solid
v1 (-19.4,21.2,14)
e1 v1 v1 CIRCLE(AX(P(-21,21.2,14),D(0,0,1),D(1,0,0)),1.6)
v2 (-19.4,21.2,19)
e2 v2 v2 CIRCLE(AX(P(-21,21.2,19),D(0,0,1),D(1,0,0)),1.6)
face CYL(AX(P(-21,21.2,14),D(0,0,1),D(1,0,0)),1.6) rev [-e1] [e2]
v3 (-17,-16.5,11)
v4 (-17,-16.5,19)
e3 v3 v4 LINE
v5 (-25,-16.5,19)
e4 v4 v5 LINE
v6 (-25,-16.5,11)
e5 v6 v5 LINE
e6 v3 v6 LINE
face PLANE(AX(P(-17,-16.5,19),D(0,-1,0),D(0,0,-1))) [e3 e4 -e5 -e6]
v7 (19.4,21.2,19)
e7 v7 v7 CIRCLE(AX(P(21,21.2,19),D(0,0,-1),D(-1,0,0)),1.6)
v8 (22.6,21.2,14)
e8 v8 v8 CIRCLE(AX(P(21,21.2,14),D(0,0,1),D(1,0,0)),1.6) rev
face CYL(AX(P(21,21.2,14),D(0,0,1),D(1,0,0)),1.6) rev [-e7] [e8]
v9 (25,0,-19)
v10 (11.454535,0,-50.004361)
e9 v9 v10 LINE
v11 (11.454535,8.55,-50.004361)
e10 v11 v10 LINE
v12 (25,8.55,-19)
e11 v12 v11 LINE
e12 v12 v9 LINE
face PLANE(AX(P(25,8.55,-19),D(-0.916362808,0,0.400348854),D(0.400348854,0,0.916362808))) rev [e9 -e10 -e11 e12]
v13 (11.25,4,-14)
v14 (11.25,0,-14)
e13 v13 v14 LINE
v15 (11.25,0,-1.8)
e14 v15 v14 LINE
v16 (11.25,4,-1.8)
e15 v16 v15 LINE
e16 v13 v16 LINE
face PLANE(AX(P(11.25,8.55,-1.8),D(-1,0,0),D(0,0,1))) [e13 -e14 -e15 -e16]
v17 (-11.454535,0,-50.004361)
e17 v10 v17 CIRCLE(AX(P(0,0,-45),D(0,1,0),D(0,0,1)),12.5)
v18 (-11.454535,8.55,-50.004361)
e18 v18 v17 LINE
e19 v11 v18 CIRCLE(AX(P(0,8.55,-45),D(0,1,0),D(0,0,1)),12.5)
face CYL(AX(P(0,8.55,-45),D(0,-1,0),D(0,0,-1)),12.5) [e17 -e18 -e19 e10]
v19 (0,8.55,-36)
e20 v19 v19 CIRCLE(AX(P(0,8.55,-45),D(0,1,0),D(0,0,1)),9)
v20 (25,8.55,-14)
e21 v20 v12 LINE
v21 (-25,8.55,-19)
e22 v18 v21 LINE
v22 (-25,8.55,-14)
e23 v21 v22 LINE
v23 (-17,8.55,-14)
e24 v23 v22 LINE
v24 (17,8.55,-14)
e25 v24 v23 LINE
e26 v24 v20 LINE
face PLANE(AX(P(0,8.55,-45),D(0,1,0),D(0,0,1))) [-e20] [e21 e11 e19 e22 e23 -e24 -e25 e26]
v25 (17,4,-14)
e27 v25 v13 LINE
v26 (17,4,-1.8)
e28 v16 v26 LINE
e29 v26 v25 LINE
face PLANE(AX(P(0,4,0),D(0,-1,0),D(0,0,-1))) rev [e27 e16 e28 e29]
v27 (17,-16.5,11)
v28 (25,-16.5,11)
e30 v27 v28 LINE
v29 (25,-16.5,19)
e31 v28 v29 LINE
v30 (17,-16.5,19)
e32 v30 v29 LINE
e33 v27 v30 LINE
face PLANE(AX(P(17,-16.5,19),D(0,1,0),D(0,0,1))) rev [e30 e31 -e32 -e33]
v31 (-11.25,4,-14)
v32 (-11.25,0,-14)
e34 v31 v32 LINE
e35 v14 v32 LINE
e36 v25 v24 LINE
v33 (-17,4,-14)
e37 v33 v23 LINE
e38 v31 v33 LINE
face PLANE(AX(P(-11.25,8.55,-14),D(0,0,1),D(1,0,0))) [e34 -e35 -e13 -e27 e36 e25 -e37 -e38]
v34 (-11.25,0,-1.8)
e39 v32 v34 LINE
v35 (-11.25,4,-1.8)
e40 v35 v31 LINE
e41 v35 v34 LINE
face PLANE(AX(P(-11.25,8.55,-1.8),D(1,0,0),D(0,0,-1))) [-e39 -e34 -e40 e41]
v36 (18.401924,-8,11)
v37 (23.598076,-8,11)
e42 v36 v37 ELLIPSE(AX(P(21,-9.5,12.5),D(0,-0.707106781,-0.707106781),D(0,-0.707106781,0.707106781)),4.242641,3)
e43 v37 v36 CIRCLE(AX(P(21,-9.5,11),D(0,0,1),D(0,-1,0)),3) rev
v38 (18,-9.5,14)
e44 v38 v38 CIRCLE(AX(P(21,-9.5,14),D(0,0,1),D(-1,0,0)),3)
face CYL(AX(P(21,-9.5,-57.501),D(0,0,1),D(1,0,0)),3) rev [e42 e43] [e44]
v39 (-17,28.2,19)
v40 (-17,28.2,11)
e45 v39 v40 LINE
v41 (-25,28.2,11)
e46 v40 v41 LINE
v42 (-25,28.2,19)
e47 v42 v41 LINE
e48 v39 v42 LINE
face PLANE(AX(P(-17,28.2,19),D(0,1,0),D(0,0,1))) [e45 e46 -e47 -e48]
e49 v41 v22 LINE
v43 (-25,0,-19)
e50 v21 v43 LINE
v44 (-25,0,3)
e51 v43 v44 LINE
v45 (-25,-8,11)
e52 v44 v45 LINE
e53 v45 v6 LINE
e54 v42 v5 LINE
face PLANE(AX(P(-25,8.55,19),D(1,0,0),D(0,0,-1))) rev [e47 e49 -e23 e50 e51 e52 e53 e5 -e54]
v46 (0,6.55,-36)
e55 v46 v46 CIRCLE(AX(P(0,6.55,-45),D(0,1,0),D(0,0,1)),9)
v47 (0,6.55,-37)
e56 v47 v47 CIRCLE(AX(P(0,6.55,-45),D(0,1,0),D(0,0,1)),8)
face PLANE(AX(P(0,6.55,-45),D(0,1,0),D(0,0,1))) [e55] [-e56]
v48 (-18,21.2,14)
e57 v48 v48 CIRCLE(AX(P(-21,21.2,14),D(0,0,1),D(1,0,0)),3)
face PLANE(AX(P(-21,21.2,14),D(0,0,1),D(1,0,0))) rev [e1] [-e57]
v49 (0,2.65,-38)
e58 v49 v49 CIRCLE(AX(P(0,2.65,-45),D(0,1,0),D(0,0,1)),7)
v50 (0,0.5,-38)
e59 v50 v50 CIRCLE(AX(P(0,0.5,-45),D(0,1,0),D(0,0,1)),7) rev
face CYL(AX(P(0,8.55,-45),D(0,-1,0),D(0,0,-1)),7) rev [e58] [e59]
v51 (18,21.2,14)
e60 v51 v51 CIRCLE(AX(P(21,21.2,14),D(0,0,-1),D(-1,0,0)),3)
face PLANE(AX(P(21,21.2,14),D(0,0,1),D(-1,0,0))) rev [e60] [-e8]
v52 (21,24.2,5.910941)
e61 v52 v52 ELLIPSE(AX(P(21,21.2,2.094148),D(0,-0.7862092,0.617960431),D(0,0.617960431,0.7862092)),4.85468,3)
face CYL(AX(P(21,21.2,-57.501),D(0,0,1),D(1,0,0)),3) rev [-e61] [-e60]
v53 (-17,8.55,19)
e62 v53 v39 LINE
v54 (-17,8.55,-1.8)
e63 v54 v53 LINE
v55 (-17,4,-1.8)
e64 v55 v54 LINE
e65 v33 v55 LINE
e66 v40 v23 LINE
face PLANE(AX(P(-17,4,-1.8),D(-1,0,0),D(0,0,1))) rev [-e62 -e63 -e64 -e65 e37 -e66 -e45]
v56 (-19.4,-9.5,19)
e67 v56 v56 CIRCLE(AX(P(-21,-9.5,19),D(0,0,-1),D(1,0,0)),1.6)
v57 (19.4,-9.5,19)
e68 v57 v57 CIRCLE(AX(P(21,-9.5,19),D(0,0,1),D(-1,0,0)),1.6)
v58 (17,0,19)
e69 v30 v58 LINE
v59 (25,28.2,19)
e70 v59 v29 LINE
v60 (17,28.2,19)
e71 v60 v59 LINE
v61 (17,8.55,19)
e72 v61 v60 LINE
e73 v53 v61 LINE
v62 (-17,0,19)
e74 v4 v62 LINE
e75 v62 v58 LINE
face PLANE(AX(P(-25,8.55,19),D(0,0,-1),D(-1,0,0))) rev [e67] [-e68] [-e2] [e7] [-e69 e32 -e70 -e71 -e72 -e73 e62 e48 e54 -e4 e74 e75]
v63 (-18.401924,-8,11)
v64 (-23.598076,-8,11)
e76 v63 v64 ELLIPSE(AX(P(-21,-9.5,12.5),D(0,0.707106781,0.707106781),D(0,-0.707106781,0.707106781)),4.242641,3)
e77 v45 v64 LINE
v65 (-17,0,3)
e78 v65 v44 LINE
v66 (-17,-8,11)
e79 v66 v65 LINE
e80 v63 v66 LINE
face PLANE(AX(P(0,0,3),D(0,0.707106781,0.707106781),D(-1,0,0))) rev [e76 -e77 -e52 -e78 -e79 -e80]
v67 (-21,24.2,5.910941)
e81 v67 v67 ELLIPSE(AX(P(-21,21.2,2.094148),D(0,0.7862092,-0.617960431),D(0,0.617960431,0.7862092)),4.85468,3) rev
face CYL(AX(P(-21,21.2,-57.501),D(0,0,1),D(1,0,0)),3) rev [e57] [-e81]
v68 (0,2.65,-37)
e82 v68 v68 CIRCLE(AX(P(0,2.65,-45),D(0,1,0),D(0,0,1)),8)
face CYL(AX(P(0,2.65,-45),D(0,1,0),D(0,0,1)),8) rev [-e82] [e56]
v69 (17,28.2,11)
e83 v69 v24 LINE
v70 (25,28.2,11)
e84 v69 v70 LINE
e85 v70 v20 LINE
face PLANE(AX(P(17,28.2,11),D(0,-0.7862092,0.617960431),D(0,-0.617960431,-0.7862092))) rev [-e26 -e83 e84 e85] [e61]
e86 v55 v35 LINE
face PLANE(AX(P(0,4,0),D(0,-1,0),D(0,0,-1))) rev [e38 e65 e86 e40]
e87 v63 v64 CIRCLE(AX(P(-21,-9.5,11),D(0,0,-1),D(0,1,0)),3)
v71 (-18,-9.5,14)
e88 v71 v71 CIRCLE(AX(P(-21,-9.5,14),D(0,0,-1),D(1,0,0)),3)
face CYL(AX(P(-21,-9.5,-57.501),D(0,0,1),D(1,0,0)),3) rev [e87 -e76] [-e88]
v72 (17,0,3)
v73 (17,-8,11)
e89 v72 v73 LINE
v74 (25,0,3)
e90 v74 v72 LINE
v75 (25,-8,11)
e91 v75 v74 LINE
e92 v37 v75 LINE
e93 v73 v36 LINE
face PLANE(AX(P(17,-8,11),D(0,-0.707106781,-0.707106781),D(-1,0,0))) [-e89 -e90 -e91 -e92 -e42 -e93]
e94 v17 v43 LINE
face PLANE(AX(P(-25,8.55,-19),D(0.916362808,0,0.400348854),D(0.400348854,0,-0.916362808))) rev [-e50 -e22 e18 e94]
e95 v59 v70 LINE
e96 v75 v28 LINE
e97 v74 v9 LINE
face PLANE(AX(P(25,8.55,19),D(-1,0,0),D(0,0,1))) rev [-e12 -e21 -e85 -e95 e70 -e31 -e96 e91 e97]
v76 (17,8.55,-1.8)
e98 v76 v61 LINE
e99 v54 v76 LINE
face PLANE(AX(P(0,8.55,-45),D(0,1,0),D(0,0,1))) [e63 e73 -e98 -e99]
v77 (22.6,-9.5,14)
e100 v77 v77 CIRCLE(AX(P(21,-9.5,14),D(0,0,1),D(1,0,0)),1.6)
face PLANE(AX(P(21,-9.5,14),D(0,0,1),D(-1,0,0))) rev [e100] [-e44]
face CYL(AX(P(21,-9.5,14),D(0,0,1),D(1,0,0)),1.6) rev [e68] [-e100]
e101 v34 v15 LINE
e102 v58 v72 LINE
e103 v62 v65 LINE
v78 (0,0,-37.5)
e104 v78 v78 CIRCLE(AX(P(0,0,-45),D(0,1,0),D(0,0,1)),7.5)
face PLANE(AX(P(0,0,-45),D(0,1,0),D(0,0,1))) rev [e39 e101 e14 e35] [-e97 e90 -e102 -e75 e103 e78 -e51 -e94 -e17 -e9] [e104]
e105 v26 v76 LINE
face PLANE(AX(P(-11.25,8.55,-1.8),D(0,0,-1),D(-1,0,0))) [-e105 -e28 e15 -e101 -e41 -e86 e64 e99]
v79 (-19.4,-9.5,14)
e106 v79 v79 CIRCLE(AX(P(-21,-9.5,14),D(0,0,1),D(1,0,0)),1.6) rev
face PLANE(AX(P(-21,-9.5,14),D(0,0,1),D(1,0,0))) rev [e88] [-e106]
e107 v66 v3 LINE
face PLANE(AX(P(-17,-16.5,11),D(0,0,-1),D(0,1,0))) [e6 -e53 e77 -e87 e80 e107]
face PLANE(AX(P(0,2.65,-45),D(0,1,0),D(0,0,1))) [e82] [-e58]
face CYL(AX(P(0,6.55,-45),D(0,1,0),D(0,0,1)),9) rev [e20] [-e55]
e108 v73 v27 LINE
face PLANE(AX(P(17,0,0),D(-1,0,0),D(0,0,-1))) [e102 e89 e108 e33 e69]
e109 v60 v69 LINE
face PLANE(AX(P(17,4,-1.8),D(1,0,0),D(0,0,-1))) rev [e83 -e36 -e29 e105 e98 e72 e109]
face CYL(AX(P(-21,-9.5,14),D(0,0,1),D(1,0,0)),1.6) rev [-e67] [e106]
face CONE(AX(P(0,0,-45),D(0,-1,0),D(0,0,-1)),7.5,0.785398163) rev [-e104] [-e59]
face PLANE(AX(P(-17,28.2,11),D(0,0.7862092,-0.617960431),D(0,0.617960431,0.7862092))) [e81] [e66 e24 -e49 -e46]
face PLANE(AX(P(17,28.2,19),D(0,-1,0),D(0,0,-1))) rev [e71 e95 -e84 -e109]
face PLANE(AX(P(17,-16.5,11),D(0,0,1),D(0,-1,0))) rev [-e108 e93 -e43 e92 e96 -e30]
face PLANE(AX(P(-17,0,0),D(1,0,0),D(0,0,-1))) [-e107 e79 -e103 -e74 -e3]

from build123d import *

# Parameters (mm, degrees)
SKETCH1_R           = 7
SKETCH1_W           = 22.5
SKETCH1_H           = 12.2
BOSS_EXTRUDE1_DEPTH = 8.55
SKETCH2_W           = 34
SKETCH2_H           = 12.2
CUT_EXTRUDE1_DEPTH  = 4.55
SKETCH3_R           = 9
CUT_EXTRUDE2_DEPTH  = 2
SKETCH4_R           = 8
CUT_EXTRUDE3_DEPTH  = 3.9
CHAMFER1_SIZE       = 0.5
BOSS_EXTRUDE2_DEPTH = 8
SKETCH6_R           = 1.6
CUT_EXTRUDE4_DEPTH  = 5
CUT_EXTRUDE5_REACH  = 82.824
SKETCH7_R           = 3
SKETCH8_W           = 8
SKETCH8_H           = 16.5
BOSS_EXTRUDE3_DEPTH = 8
CHAMFER2_SIZE       = 8


# Read off the part's stored shape, not the designer's step: Mirror3
with BuildPart() as part:
    # Sketch1 → Boss-Extrude1 (new body)
    with BuildSketch(Plane(origin=(0, 0, 0), x_dir=(1, 0, 0), z_dir=(0, 1, 0))):
        with BuildLine():
            Line((-25, 19), (-11.454535097, 50.00436067))
            ThreePointArc((-11.454535097, 50.00436067), (0, 57.5), (11.454535097, 50.00436067))
            Line((11.454535097, 50.00436067), (25, 19))
            Line((25, 19), (25, -19))
            Line((25, -19), (-25, -19))
            Line((-25, -19), (-25, 19))
        make_face()
        with Locations(Location((0, 45, 0), (0, 0, 270))):
            Circle(SKETCH1_R, mode=Mode.SUBTRACT)
        with Locations((0, 7.9)):
            Rectangle(SKETCH1_W, SKETCH1_H, mode=Mode.SUBTRACT)
    extrude(amount=BOSS_EXTRUDE1_DEPTH)

    # Sketch2 → Cut-Extrude1 (cut)
    with BuildSketch(Plane(origin=(0, 8.55, 0), x_dir=(1, 0, 0), z_dir=(0, 1, 0))):
        with Locations((0, 7.9)):
            Rectangle(SKETCH2_W, SKETCH2_H)
    extrude(amount=-CUT_EXTRUDE1_DEPTH, mode=Mode.SUBTRACT)

    # Sketch3 → Cut-Extrude2 (cut)
    with BuildSketch(Plane(origin=(0, 8.55, 0), x_dir=(1, 0, 0), z_dir=(0, 1, 0))):
        with Locations(Location((0, 45, 0), (0, 0, 270))):
            Circle(SKETCH3_R)
    extrude(amount=-CUT_EXTRUDE2_DEPTH, mode=Mode.SUBTRACT)

    # Sketch4 → Cut-Extrude3 (cut)
    with BuildSketch(Plane(origin=(0, 6.55, 0), x_dir=(1, 0, 0), z_dir=(0, 1, 0))):
        with Locations(Location((0, 45, 0), (0, 0, 270))):
            Circle(SKETCH4_R)
    extrude(amount=-CUT_EXTRUDE3_DEPTH, mode=Mode.SUBTRACT)

    # Chamfer1
    chamfer1_edges = [part.edges().sort_by_distance(p)[0] for p in [
        (0, 0, -52),
    ]]
    chamfer(chamfer1_edges, length=CHAMFER1_SIZE)

    # Sketch5 → Boss-Extrude2 (add)
    with BuildSketch(Plane.ZY.offset(25)):
        Polygon((19, 8.55), (19, 28.2), (11, 28.2), (-14, 8.55), align=None)
    extrude(amount=-BOSS_EXTRUDE2_DEPTH)

    # Sketch6 → Cut-Extrude4 (cut)
    with BuildSketch(Plane.XY.offset(19)):
        with Locations((-21, 21.2)):
            Circle(SKETCH6_R)
    cut_extrude4 = extrude(amount=-CUT_EXTRUDE4_DEPTH, mode=Mode.SUBTRACT)

    # Cut-Extrude5: up to this plane
    cut_extrude5_end = Plane(origin=(-17, 28.2, 11), z_dir=(0, 0.7862091997273701, -0.617960430985713))
    # Sketch7 → Cut-Extrude5 (cut, up to the surface)
    with BuildSketch(Plane.XY.offset(14), mode=Mode.PRIVATE) as cut_extrude5_sk1:
        with Locations((-21, 21.2)):
            Circle(SKETCH7_R)
    cut_extrude5_tool1 = split(extrude(cut_extrude5_sk1.sketch, amount=-CUT_EXTRUDE5_REACH, mode=Mode.PRIVATE), bisect_by=cut_extrude5_end, keep=Keep.BOTH, mode=Mode.PRIVATE)
    cut_extrude5 = cut_extrude5_tool1.solids().sort_by_distance((-21, 21.2, 14))[0]
    add(cut_extrude5, mode=Mode.SUBTRACT)

    # Sketch8 → Boss-Extrude3 (add)
    with BuildSketch(Plane.ZY.offset(25)):
        with Locations((15, -8.25)):
            Rectangle(SKETCH8_W, SKETCH8_H)
    extrude(amount=-BOSS_EXTRUDE3_DEPTH)

    # Chamfer2
    chamfer2_edges = [part.edges().sort_by_distance(p)[0] for p in [
        (-21, 0, 11),
    ]]
    chamfer(chamfer2_edges, length=CHAMFER2_SIZE)

    # Mirror2: Cut-Extrude4, Cut-Extrude5 across plane
    add(cut_extrude4.mirror(Plane.ZX.offset(5.85)), mode=Mode.SUBTRACT)
    add(cut_extrude5.mirror(Plane.ZX.offset(5.85)), mode=Mode.SUBTRACT)

    # Mirror3: part across plane


with BuildPart() as part_1:
    add(part.part)
    add(part.part.mirror(Plane(origin=(0, 0, 0), x_dir=(0, 0, 1), z_dir=(1, 0, 0))))


solid = part_1.part
